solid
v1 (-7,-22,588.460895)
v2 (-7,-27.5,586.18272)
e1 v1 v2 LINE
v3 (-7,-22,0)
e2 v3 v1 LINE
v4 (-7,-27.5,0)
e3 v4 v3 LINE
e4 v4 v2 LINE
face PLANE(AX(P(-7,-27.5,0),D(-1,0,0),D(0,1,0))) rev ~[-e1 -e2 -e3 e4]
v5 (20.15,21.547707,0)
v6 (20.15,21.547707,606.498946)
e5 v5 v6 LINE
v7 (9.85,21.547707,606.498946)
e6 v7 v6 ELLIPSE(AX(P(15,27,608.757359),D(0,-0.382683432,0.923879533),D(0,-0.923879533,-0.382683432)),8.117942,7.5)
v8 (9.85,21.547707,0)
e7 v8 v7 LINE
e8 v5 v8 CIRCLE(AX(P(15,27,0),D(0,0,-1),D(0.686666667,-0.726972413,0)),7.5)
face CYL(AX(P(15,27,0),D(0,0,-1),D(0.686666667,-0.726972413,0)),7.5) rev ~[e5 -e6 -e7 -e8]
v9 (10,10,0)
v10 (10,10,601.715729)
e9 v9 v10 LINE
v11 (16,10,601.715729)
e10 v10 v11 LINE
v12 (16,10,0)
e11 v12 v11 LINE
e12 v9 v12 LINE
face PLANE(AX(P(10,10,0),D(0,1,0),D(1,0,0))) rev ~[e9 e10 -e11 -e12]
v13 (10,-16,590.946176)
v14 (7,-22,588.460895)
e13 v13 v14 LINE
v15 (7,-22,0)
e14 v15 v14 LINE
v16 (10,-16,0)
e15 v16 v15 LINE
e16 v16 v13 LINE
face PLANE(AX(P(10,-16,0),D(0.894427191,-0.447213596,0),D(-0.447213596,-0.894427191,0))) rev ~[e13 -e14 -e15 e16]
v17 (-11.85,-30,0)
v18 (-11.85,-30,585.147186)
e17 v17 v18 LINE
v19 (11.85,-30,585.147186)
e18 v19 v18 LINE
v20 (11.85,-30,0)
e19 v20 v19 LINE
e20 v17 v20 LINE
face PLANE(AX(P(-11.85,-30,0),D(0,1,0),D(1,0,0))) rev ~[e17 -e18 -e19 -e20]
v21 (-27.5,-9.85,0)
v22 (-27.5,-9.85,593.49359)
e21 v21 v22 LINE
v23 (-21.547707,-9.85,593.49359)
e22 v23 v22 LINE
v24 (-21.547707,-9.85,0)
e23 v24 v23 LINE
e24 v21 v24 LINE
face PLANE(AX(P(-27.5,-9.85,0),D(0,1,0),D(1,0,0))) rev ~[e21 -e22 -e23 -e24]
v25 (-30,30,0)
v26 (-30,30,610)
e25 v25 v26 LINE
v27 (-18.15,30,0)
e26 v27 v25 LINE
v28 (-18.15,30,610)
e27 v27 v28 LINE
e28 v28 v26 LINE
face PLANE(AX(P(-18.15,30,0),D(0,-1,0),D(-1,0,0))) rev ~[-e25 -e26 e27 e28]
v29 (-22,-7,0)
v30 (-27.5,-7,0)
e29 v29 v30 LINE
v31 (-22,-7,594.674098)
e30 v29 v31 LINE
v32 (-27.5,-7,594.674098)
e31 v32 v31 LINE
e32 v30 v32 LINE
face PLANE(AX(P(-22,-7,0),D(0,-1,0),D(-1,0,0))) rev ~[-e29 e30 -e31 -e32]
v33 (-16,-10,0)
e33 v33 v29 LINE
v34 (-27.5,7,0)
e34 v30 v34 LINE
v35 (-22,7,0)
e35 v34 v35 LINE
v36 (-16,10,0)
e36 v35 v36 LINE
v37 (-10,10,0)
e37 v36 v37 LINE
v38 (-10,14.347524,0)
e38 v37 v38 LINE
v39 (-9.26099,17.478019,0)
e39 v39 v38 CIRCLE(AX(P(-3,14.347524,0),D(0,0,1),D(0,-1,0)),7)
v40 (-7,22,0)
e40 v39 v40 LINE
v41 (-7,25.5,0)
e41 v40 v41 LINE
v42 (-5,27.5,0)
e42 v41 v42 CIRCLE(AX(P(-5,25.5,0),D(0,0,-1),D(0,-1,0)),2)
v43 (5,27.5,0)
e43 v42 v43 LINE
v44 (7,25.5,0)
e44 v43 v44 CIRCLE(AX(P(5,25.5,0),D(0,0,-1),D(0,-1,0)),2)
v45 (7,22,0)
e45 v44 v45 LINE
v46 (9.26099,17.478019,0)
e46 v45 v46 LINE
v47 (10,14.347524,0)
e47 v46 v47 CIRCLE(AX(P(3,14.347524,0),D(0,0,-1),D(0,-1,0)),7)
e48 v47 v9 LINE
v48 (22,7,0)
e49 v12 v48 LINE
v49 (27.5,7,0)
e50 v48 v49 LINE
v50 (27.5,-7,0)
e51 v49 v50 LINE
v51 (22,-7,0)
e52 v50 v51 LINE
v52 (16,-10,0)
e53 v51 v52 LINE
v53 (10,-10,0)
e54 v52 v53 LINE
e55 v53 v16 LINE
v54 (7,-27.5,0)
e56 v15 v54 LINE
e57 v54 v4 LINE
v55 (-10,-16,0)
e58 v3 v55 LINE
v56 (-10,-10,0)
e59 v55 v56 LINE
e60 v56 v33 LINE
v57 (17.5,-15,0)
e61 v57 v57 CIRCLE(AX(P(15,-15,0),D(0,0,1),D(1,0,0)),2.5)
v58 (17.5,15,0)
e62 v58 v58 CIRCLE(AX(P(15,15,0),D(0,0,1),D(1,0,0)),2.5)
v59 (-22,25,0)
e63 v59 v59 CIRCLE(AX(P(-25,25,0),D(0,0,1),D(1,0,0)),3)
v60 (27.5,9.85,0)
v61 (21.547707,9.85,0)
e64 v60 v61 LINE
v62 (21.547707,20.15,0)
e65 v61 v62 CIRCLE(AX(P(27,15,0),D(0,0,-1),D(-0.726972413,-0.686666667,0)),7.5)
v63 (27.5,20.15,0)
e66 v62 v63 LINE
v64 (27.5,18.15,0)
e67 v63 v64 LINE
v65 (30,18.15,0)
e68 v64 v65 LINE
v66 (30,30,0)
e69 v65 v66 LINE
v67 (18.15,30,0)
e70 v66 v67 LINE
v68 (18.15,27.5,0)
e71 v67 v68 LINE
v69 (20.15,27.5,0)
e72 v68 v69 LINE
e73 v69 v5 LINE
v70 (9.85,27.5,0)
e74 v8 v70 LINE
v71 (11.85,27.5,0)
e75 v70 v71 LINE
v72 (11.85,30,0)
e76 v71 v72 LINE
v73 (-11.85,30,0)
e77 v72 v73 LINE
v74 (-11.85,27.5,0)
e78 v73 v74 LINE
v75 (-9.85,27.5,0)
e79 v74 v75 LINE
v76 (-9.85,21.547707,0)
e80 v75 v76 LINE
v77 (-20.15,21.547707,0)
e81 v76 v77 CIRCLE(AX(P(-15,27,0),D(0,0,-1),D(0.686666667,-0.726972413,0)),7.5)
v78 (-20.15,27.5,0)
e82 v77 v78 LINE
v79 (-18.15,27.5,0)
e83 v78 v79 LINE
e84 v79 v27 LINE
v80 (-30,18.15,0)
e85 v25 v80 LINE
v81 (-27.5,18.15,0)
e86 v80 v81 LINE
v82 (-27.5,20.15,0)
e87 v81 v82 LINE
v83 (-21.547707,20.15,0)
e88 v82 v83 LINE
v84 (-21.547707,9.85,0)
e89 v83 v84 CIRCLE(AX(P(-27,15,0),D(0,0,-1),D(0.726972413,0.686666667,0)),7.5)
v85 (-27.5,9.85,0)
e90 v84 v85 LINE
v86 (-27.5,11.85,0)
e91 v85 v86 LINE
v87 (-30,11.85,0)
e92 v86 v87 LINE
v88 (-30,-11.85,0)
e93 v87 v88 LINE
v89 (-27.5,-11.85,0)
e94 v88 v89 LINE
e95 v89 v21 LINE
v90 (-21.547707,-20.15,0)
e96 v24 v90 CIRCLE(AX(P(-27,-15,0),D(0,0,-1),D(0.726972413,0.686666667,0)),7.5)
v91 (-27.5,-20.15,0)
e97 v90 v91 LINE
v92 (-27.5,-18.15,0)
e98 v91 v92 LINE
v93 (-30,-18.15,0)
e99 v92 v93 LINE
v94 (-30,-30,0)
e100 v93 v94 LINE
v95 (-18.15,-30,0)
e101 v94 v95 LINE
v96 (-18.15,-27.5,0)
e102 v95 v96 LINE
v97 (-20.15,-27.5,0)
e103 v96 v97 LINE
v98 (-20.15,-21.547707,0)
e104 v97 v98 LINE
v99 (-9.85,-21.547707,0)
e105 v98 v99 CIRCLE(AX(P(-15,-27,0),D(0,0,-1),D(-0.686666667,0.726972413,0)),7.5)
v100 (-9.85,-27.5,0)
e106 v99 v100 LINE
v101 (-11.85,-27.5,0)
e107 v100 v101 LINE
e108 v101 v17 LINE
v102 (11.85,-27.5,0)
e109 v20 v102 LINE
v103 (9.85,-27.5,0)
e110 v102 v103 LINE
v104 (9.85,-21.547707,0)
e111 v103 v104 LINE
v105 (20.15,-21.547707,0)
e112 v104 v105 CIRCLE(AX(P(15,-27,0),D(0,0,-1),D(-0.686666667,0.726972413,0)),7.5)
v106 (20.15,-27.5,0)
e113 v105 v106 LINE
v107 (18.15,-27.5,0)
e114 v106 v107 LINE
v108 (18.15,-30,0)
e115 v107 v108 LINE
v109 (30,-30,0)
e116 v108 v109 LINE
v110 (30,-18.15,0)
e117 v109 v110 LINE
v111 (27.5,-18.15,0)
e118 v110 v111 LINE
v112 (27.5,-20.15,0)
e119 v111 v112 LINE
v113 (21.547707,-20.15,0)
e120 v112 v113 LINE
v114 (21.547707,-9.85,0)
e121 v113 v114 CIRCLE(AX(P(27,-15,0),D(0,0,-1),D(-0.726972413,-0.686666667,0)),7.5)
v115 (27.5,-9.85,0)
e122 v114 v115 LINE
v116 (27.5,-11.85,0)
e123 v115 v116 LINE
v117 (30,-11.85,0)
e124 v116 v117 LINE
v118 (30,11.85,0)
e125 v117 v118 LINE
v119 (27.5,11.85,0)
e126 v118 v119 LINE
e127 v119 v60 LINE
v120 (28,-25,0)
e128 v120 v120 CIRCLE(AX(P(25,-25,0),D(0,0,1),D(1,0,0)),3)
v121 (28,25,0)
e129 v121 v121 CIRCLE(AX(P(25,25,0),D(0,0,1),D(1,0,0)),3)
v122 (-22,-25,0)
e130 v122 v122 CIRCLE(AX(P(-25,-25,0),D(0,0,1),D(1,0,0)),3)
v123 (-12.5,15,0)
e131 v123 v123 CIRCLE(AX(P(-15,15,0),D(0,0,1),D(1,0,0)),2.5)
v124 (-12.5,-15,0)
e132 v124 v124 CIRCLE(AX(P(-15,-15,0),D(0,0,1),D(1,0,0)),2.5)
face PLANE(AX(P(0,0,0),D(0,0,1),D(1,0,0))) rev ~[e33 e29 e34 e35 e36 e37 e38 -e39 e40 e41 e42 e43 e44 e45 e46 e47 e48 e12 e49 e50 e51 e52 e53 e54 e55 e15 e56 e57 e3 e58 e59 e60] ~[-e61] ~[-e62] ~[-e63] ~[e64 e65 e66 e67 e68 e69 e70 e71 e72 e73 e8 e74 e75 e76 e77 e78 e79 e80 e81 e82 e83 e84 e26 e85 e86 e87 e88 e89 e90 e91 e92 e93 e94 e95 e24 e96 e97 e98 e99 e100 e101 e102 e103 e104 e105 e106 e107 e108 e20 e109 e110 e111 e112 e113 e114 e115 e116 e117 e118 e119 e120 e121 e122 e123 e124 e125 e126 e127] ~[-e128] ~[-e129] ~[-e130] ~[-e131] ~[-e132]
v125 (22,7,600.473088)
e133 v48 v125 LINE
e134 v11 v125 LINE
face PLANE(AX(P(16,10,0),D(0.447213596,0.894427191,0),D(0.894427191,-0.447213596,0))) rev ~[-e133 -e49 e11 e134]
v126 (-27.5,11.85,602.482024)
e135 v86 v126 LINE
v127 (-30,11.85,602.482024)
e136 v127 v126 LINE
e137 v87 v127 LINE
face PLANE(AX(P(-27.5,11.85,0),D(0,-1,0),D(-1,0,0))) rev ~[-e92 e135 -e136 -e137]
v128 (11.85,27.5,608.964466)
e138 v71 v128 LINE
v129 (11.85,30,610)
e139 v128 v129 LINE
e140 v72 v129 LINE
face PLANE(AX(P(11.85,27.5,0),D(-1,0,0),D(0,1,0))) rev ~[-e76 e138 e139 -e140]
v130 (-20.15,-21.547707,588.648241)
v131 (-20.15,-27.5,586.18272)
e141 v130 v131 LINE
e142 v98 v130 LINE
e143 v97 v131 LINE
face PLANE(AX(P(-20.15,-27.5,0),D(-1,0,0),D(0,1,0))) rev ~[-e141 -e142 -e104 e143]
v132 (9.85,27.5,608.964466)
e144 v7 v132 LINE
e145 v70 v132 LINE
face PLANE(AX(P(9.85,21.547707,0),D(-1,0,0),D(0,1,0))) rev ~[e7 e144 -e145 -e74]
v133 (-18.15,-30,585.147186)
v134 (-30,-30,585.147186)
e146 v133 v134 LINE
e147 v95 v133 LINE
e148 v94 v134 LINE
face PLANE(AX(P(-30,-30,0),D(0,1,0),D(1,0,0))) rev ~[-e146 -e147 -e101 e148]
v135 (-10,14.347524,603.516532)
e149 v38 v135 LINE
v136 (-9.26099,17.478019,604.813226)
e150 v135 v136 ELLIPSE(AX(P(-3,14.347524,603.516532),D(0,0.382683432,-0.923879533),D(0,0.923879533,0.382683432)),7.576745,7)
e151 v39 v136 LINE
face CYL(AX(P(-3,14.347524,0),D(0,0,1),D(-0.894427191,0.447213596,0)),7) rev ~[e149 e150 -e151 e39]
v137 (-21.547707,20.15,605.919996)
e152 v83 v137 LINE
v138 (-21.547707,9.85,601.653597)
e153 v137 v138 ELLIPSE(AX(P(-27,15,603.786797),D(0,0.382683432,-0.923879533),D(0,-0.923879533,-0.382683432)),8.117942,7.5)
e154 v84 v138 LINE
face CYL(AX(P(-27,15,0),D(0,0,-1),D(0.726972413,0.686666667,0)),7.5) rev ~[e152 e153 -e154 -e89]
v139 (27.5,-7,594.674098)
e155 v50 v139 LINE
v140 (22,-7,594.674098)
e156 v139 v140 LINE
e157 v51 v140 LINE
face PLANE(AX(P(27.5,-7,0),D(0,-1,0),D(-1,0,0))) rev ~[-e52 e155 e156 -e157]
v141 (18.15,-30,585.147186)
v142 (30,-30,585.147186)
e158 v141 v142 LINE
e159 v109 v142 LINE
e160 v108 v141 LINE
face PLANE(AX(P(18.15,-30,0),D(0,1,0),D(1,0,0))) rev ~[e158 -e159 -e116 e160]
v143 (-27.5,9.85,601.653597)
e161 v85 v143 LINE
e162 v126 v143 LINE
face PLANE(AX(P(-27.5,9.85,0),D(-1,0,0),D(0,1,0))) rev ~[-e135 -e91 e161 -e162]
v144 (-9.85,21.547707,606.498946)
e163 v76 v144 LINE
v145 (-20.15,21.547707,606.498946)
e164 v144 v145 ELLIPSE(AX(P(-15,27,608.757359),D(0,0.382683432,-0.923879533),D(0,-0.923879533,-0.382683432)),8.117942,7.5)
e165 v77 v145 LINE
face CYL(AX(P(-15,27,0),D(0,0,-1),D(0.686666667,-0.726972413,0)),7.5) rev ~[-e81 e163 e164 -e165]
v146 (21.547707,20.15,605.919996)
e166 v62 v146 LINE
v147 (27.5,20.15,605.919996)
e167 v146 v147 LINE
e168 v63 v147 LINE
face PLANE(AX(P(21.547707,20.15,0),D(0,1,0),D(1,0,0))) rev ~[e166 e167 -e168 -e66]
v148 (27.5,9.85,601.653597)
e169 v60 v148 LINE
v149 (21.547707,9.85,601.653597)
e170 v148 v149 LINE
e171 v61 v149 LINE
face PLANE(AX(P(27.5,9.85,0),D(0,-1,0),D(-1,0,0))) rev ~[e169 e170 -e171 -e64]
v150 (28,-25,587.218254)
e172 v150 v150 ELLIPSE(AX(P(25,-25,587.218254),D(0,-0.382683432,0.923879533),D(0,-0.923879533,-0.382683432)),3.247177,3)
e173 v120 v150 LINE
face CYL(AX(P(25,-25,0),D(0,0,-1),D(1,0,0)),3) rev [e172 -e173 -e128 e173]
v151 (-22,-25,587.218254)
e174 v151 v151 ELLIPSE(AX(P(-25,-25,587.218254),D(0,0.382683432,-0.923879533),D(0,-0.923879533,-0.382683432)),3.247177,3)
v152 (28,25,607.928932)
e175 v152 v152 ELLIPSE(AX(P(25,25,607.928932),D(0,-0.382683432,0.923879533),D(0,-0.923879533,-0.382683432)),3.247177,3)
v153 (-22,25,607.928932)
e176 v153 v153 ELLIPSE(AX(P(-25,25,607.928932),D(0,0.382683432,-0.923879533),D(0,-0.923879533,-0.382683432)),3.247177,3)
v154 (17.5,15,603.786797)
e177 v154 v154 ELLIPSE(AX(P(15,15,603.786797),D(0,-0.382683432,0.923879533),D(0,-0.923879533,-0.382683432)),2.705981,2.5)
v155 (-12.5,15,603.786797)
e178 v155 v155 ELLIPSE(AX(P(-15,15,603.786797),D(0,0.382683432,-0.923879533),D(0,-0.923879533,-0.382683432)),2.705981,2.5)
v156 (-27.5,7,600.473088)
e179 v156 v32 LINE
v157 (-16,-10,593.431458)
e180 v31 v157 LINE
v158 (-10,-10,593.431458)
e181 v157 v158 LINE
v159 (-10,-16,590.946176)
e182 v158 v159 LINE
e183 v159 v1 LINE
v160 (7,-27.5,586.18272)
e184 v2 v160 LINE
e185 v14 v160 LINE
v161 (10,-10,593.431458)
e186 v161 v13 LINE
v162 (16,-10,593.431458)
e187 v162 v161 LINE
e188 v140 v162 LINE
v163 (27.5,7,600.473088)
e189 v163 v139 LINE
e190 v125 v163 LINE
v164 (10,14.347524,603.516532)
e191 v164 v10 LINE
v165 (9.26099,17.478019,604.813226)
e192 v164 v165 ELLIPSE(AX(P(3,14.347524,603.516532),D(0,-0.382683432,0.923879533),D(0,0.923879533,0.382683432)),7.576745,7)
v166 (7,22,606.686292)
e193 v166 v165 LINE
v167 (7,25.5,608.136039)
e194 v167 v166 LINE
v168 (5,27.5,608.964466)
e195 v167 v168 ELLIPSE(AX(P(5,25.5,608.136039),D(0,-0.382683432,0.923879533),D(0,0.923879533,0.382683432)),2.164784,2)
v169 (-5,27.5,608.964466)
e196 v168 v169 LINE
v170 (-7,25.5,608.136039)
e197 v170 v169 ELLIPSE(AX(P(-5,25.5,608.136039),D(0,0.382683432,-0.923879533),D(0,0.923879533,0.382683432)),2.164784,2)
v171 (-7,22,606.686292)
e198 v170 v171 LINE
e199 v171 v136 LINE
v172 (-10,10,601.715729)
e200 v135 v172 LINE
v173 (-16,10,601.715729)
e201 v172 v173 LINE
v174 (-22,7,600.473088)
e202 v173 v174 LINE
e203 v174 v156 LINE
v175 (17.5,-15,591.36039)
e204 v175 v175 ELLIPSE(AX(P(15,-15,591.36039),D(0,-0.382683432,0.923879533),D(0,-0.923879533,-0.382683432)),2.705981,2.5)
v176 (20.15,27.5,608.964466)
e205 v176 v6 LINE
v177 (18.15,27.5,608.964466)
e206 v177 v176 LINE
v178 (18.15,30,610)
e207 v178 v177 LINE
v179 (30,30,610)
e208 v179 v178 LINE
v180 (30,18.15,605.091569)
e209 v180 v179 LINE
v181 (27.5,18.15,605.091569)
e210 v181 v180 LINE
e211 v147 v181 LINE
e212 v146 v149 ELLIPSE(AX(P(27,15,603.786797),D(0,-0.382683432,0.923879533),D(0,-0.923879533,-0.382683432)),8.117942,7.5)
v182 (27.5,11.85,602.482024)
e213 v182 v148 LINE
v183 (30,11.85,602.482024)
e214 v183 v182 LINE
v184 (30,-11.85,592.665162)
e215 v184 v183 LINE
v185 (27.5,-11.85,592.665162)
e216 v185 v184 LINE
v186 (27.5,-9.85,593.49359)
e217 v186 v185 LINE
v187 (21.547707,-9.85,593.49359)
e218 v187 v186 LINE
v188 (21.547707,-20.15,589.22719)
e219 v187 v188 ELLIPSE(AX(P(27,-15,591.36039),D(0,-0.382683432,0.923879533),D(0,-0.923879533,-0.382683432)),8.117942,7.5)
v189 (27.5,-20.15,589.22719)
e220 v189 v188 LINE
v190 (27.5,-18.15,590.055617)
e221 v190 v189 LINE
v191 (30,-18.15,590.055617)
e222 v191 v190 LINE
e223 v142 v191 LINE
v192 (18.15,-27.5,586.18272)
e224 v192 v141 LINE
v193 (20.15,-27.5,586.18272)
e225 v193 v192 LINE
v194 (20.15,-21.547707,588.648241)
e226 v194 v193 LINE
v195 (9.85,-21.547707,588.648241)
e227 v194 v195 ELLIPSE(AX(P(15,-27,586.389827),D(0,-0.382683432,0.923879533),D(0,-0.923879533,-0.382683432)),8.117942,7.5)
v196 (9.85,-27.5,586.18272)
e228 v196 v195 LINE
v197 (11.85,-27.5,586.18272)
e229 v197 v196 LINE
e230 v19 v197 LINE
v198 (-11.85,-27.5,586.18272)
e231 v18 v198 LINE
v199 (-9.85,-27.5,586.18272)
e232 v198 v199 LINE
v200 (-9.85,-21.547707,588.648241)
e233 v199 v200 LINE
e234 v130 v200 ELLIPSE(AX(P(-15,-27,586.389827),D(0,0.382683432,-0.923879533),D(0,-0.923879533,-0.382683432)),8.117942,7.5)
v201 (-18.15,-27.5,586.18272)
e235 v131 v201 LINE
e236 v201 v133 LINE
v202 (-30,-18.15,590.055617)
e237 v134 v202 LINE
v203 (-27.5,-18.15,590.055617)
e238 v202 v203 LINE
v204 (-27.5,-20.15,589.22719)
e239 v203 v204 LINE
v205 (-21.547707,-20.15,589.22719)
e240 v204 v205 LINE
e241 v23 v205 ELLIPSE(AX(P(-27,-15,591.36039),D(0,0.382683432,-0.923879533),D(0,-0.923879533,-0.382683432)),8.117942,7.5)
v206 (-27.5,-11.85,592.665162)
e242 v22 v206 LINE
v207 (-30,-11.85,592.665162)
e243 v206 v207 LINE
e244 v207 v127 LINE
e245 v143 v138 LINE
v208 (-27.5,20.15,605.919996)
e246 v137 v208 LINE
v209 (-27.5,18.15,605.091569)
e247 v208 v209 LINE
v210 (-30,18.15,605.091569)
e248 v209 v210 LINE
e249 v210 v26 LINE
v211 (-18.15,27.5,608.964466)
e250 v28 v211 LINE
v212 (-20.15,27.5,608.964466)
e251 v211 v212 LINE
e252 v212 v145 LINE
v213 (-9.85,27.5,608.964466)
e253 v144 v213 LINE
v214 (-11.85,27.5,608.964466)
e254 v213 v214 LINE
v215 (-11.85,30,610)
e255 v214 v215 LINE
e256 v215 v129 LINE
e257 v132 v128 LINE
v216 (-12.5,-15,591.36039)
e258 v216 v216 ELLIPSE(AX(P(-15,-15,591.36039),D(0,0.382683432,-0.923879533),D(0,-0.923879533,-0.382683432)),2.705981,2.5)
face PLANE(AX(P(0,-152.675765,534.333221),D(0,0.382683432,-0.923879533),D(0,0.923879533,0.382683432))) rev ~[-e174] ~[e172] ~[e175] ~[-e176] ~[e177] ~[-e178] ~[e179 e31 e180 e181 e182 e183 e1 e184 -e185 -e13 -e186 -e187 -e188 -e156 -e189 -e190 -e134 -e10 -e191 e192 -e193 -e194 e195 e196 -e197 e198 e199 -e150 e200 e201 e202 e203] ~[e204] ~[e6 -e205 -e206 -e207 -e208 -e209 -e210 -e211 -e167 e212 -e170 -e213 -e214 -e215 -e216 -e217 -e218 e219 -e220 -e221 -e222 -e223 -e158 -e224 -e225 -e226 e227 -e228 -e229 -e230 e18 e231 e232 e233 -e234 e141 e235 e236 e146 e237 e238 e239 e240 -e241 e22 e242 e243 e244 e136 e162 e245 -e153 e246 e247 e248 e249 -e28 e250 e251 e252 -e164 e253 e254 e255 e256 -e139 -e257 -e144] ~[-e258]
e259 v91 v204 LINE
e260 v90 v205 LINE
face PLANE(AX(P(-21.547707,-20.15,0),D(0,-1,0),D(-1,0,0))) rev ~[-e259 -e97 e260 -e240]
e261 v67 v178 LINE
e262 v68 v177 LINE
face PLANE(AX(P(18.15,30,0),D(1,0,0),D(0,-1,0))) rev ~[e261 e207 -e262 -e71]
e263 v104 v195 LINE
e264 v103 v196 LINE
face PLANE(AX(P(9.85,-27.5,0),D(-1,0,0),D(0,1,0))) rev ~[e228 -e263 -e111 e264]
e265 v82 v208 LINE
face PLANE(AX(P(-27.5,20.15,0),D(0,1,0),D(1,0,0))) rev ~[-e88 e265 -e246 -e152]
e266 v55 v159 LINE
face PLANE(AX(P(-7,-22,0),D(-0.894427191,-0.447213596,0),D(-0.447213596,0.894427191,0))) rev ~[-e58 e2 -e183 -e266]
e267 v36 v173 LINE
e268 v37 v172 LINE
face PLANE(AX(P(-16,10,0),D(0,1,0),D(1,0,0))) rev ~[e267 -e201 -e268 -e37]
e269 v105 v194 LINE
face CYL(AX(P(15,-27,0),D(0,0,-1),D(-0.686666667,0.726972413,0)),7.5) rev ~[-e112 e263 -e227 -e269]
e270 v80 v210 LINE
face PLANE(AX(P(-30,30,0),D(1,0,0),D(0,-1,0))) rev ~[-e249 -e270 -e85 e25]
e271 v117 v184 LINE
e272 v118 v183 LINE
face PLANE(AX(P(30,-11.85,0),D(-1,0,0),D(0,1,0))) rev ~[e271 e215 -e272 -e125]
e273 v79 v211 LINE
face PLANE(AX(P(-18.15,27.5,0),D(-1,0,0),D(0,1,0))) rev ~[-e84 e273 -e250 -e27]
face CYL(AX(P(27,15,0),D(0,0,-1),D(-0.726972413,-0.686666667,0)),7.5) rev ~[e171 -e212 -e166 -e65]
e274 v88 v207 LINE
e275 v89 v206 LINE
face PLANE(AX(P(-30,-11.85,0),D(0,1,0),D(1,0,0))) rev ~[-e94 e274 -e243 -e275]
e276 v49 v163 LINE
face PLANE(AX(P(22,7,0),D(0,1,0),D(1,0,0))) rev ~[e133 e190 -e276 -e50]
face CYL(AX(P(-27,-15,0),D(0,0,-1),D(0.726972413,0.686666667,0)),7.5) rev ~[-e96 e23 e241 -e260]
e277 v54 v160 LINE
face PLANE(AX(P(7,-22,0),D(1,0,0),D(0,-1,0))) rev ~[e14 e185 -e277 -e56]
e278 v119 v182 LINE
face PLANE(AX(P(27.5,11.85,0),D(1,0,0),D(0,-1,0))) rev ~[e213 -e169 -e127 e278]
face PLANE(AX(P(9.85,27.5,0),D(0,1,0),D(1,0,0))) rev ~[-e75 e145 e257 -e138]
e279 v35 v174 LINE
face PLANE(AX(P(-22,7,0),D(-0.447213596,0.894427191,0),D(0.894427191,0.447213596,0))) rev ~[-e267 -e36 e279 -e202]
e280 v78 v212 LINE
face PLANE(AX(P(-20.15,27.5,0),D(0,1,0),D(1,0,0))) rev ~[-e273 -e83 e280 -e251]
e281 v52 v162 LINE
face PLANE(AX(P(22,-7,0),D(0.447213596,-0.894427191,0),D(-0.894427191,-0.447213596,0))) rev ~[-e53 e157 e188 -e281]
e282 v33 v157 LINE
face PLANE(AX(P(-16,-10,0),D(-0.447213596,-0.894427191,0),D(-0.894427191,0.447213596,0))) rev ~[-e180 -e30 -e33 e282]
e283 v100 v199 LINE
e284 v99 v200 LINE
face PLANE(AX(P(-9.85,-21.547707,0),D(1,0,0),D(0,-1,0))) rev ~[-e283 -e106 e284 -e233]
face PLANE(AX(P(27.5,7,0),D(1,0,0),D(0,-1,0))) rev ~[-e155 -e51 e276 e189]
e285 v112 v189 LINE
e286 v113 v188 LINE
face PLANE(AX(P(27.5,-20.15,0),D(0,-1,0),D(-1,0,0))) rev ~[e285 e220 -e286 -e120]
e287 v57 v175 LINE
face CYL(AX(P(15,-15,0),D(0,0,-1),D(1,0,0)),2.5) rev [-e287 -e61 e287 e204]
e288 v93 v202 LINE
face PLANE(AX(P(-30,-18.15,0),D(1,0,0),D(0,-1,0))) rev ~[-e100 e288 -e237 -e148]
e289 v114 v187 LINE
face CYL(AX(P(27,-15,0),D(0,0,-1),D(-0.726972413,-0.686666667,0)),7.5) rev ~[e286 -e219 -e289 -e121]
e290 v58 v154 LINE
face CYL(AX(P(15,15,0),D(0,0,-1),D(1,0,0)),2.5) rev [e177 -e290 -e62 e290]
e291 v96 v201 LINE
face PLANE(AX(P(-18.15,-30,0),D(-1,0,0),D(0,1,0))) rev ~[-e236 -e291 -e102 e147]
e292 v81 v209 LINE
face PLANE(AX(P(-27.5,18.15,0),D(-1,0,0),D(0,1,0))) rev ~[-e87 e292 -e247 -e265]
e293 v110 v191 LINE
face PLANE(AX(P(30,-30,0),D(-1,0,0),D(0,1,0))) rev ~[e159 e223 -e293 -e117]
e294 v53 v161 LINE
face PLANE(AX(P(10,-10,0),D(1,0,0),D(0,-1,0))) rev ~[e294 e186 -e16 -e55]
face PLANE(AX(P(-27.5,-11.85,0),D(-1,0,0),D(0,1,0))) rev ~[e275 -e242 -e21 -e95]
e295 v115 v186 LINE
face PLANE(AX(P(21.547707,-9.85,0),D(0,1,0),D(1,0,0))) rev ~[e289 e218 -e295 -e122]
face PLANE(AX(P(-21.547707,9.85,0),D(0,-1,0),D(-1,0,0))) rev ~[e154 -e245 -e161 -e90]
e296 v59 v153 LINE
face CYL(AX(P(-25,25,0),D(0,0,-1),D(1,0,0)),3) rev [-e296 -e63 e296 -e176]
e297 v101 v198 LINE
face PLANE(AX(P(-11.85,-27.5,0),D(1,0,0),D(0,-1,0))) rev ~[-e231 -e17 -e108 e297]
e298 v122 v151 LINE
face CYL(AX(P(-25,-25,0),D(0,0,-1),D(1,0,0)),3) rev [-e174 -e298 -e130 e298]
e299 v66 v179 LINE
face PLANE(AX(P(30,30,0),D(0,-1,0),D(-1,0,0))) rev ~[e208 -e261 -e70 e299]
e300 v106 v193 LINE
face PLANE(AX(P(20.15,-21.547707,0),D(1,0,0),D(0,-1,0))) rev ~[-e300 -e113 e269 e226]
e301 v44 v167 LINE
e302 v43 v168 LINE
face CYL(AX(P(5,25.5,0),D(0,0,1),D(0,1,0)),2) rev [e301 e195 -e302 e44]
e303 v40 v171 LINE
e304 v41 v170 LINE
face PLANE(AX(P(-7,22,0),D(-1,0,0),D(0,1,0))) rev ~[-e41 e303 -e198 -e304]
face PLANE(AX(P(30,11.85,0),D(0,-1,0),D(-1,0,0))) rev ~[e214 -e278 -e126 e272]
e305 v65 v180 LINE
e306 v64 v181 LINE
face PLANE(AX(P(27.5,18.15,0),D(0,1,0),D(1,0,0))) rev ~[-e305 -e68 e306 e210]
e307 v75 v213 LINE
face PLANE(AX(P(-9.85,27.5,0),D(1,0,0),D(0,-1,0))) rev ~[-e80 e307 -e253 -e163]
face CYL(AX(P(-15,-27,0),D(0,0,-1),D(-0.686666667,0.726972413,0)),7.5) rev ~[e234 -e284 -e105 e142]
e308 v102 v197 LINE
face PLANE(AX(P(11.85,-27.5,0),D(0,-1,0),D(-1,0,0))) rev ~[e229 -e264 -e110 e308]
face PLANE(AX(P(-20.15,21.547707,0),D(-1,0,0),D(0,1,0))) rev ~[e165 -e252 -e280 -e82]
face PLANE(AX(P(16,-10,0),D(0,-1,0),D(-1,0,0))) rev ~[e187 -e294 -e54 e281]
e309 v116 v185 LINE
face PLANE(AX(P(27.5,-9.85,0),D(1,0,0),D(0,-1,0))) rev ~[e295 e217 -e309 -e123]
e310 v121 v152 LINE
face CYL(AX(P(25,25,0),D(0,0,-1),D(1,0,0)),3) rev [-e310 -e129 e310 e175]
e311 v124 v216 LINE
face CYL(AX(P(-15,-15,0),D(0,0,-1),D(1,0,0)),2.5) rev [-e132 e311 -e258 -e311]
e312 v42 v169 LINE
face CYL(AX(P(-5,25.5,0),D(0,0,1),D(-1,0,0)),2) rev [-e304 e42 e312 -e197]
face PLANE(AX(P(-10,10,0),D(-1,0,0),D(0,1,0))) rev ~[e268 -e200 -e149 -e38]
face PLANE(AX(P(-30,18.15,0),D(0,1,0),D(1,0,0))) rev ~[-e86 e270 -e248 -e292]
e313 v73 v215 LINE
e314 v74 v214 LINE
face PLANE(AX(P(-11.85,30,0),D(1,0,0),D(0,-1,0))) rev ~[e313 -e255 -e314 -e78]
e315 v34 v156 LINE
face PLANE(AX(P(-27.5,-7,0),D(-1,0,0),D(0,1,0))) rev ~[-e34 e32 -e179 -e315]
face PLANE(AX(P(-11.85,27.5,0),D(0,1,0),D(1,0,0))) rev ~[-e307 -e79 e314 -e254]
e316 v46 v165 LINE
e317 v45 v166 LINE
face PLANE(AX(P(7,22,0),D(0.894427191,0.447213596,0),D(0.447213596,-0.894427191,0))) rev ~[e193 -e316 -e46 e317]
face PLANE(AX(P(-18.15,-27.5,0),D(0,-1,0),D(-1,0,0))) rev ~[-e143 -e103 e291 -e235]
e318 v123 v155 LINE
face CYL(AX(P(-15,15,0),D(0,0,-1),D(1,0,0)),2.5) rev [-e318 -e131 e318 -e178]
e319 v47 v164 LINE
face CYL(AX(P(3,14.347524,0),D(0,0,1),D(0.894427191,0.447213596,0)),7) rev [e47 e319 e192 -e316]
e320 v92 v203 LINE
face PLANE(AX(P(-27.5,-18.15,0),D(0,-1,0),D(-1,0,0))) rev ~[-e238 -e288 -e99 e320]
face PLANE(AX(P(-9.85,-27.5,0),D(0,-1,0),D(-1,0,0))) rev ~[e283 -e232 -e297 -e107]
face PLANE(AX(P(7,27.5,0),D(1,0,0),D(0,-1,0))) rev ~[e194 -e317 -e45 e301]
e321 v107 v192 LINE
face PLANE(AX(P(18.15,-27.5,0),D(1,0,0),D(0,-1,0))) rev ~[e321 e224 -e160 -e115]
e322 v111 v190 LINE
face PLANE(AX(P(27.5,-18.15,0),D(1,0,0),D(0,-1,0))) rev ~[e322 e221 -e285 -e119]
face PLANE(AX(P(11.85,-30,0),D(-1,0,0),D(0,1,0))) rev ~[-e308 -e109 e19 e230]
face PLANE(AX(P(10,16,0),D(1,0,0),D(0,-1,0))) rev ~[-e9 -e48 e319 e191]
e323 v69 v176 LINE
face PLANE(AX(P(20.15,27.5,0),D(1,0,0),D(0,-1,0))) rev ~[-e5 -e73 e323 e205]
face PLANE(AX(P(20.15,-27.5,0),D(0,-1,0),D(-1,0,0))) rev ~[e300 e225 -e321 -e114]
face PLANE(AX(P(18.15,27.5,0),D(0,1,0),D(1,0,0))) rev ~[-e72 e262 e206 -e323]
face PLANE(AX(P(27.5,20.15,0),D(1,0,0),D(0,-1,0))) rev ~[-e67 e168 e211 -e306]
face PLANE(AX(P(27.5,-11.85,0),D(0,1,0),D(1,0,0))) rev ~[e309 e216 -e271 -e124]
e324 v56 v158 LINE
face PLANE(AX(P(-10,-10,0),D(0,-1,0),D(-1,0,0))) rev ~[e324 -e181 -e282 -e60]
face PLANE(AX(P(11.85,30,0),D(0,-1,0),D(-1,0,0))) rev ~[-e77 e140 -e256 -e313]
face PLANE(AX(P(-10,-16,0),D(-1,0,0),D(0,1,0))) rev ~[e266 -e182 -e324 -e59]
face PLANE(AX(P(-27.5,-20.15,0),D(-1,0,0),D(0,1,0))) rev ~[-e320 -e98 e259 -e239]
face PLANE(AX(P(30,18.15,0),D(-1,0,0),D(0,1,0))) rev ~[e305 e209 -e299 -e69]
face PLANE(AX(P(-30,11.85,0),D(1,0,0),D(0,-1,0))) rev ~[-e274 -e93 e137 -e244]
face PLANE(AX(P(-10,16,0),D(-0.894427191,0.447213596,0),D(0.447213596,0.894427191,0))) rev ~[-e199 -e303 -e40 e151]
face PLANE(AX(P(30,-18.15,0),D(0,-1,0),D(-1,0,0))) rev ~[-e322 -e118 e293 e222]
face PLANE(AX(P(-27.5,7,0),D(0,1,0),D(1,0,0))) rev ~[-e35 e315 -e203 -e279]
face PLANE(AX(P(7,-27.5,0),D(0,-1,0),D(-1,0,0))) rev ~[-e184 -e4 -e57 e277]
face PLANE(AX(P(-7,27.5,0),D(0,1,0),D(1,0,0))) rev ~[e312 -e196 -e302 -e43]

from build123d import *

# Parameters (mm, degrees)
F0_R          = 3
F0_R_2        = 2.5
F1_DEPTH      = 610
F2_R          = 2
F3_R          = 7
F5_DEPTH      = 30
F5_DEPTH_BACK = 30


# Not quite as in the source:
# - a feature names something its author has since deleted; it is built from what else it names


with BuildPart() as f1:
    # F0 (on Top) → F1 (new body)
    with BuildSketch(Plane.XY):
        with BuildLine():
            Line((18.15, -30), (30, -30))
            Line((30, -30), (30, -18.15))
            Line((30, -18.15), (27.5, -18.15))
            Line((27.5, -18.15), (27.5, -20.15))
            Line((27.5, -20.15), (21.5477069044, -20.15))
            ThreePointArc((21.5477069044, -20.15), (19.5, -15), (21.5477069044, -9.85))
            Line((21.5477069044, -9.85), (27.5, -9.85))
            Line((27.5, -9.85), (27.5, -11.85))
            Line((27.5, -11.85), (30, -11.85))
            Line((30, -11.85), (30, 11.85))
            Line((30, 11.85), (27.5, 11.85))
            Line((27.5, 11.85), (27.5, 9.85))
            Line((27.5, 9.85), (21.5477069044, 9.85))
            ThreePointArc((21.5477069044, 9.85), (19.5, 15), (21.5477069044, 20.15))
            Line((21.5477069044, 20.15), (27.5, 20.15))
            Line((27.5, 20.15), (27.5, 18.15))
            Line((27.5, 18.15), (30, 18.15))
            Line((30, 18.15), (30, 30))
            Line((30, 30), (18.15, 30))
            Line((18.15, 30), (18.15, 27.5))
            Line((18.15, 27.5), (20.15, 27.5))
            Line((20.15, 27.5), (20.15, 21.5477069044))
            ThreePointArc((20.15, 21.5477069044), (15, 19.5), (9.85, 21.5477069044))
            Line((9.85, 21.5477069044), (9.85, 27.5))
            Line((9.85, 27.5), (11.85, 27.5))
            Line((11.85, 27.5), (11.85, 30))
            Line((11.85, 30), (-11.85, 30))
            Line((-11.85, 30), (-11.85, 27.5))
            Line((-11.85, 27.5), (-9.85, 27.5))
            Line((-9.85, 27.5), (-9.85, 21.5477069044))
            ThreePointArc((-9.85, 21.5477069044), (-15, 19.5), (-20.15, 21.5477069044))
            Line((-20.15, 21.5477069044), (-20.15, 27.5))
            Line((-20.15, 27.5), (-18.15, 27.5))
            Line((-18.15, 27.5), (-18.15, 30))
            Line((-18.15, 30), (-30, 30))
            Line((-30, 30), (-30, 18.15))
            Line((-30, 18.15), (-27.5, 18.15))
            Line((-27.5, 18.15), (-27.5, 20.15))
            Line((-27.5, 20.15), (-21.5477069044, 20.15))
            ThreePointArc((-21.5477069044, 20.15), (-19.5, 15), (-21.5477069044, 9.85))
            Line((-21.5477069044, 9.85), (-27.5, 9.85))
            Line((-27.5, 9.85), (-27.5, 11.85))
            Line((-27.5, 11.85), (-30, 11.85))
            Line((-30, 11.85), (-30, -11.85))
            Line((-30, -11.85), (-27.5, -11.85))
            Line((-27.5, -11.85), (-27.5, -9.85))
            Line((-27.5, -9.85), (-21.5477069044, -9.85))
            ThreePointArc((-21.5477069044, -9.85), (-19.5, -15), (-21.5477069044, -20.15))
            Line((-21.5477069044, -20.15), (-27.5, -20.15))
            Line((-27.5, -20.15), (-27.5, -18.15))
            Line((-27.5, -18.15), (-30, -18.15))
            Line((-30, -18.15), (-30, -30))
            Line((-30, -30), (-18.15, -30))
            Line((-18.15, -30), (-18.15, -27.5))
            Line((-18.15, -27.5), (-20.15, -27.5))
            Line((-20.15, -27.5), (-20.15, -21.5477069044))
            ThreePointArc((-20.15, -21.5477069044), (-15, -19.5), (-9.85, -21.5477069044))
            Line((-9.85, -21.5477069044), (-9.85, -27.5))
            Line((-9.85, -27.5), (-11.85, -27.5))
            Line((-11.85, -27.5), (-11.85, -30))
            Line((-11.85, -30), (11.85, -30))
            Line((11.85, -30), (11.85, -27.5))
            Line((11.85, -27.5), (9.85, -27.5))
            Line((9.85, -27.5), (9.85, -21.5477069044))
            ThreePointArc((9.85, -21.5477069044), (15, -19.5), (20.15, -21.5477069044))
            Line((20.15, -21.5477069044), (20.15, -27.5))
            Line((20.15, -27.5), (18.15, -27.5))
            Line((18.15, -27.5), (18.15, -30))
        make_face()
        with Locations((-25, -25)):
            Circle(F0_R, mode=Mode.SUBTRACT)
        with Locations((-15, -15)):
            Circle(F0_R_2, mode=Mode.SUBTRACT)
        with Locations((25, -25)):
            Circle(F0_R, mode=Mode.SUBTRACT)
        with Locations((15, -15)):
            Circle(F0_R_2, mode=Mode.SUBTRACT)
        with Locations((-25, 25)):
            Circle(F0_R, mode=Mode.SUBTRACT)
        with Locations((-15, 15)):
            Circle(F0_R_2, mode=Mode.SUBTRACT)
        Polygon((-7, 22), (-7, 27.5), (0, 27.5), (7, 27.5), (7, 22), (10, 16), (10, 10), (16, 10), (22, 7), (27.5, 7), (27.5, 0), (27.5, -7), (22, -7), (16, -10), (10, -10), (10, -16), (7, -22), (7, -27.5), (0, -27.5), (-7, -27.5), (-7, -22), (-10, -16), (-10, -10), (-16, -10), (-22, -7), (-27.5, -7), (-27.5, 0), (-27.5, 7), (-22, 7), (-16, 10), (-10, 10), (-10, 16), align=None, mode=Mode.SUBTRACT)
        with Locations((15, 15)):
            Circle(F0_R_2, mode=Mode.SUBTRACT)
        with Locations((25, 25)):
            Circle(F0_R, mode=Mode.SUBTRACT)
    extrude(amount=F1_DEPTH)

    # F2
    f2_edges = [f1.edges().sort_by_distance(p)[0] for p in [
        (-7, 27.5, 305),
        (7, 27.5, 305),
    ]]
    fillet(f2_edges, radius=F2_R)

    # F3
    f3_edges = [f1.edges().sort_by_distance(p)[0] for p in [
        (-10, 16, 305),
        (10, 16, 305),
    ]]
    fillet(f3_edges, radius=F3_R)

    # F4 (on Right) → F5 (cut, two sides)
    with BuildSketch(Plane.YZ) as f5_sk:
        Polygon((-66.9285170742, 844.0061405012), (-249.6042822322, 768.3393610558), (-152.6757651581, 534.3332205546), (30, 610), align=None)
    extrude(amount=F5_DEPTH, mode=Mode.SUBTRACT)
    extrude(f5_sk.sketch, amount=-F5_DEPTH_BACK, mode=Mode.SUBTRACT)


solid = f1.part
